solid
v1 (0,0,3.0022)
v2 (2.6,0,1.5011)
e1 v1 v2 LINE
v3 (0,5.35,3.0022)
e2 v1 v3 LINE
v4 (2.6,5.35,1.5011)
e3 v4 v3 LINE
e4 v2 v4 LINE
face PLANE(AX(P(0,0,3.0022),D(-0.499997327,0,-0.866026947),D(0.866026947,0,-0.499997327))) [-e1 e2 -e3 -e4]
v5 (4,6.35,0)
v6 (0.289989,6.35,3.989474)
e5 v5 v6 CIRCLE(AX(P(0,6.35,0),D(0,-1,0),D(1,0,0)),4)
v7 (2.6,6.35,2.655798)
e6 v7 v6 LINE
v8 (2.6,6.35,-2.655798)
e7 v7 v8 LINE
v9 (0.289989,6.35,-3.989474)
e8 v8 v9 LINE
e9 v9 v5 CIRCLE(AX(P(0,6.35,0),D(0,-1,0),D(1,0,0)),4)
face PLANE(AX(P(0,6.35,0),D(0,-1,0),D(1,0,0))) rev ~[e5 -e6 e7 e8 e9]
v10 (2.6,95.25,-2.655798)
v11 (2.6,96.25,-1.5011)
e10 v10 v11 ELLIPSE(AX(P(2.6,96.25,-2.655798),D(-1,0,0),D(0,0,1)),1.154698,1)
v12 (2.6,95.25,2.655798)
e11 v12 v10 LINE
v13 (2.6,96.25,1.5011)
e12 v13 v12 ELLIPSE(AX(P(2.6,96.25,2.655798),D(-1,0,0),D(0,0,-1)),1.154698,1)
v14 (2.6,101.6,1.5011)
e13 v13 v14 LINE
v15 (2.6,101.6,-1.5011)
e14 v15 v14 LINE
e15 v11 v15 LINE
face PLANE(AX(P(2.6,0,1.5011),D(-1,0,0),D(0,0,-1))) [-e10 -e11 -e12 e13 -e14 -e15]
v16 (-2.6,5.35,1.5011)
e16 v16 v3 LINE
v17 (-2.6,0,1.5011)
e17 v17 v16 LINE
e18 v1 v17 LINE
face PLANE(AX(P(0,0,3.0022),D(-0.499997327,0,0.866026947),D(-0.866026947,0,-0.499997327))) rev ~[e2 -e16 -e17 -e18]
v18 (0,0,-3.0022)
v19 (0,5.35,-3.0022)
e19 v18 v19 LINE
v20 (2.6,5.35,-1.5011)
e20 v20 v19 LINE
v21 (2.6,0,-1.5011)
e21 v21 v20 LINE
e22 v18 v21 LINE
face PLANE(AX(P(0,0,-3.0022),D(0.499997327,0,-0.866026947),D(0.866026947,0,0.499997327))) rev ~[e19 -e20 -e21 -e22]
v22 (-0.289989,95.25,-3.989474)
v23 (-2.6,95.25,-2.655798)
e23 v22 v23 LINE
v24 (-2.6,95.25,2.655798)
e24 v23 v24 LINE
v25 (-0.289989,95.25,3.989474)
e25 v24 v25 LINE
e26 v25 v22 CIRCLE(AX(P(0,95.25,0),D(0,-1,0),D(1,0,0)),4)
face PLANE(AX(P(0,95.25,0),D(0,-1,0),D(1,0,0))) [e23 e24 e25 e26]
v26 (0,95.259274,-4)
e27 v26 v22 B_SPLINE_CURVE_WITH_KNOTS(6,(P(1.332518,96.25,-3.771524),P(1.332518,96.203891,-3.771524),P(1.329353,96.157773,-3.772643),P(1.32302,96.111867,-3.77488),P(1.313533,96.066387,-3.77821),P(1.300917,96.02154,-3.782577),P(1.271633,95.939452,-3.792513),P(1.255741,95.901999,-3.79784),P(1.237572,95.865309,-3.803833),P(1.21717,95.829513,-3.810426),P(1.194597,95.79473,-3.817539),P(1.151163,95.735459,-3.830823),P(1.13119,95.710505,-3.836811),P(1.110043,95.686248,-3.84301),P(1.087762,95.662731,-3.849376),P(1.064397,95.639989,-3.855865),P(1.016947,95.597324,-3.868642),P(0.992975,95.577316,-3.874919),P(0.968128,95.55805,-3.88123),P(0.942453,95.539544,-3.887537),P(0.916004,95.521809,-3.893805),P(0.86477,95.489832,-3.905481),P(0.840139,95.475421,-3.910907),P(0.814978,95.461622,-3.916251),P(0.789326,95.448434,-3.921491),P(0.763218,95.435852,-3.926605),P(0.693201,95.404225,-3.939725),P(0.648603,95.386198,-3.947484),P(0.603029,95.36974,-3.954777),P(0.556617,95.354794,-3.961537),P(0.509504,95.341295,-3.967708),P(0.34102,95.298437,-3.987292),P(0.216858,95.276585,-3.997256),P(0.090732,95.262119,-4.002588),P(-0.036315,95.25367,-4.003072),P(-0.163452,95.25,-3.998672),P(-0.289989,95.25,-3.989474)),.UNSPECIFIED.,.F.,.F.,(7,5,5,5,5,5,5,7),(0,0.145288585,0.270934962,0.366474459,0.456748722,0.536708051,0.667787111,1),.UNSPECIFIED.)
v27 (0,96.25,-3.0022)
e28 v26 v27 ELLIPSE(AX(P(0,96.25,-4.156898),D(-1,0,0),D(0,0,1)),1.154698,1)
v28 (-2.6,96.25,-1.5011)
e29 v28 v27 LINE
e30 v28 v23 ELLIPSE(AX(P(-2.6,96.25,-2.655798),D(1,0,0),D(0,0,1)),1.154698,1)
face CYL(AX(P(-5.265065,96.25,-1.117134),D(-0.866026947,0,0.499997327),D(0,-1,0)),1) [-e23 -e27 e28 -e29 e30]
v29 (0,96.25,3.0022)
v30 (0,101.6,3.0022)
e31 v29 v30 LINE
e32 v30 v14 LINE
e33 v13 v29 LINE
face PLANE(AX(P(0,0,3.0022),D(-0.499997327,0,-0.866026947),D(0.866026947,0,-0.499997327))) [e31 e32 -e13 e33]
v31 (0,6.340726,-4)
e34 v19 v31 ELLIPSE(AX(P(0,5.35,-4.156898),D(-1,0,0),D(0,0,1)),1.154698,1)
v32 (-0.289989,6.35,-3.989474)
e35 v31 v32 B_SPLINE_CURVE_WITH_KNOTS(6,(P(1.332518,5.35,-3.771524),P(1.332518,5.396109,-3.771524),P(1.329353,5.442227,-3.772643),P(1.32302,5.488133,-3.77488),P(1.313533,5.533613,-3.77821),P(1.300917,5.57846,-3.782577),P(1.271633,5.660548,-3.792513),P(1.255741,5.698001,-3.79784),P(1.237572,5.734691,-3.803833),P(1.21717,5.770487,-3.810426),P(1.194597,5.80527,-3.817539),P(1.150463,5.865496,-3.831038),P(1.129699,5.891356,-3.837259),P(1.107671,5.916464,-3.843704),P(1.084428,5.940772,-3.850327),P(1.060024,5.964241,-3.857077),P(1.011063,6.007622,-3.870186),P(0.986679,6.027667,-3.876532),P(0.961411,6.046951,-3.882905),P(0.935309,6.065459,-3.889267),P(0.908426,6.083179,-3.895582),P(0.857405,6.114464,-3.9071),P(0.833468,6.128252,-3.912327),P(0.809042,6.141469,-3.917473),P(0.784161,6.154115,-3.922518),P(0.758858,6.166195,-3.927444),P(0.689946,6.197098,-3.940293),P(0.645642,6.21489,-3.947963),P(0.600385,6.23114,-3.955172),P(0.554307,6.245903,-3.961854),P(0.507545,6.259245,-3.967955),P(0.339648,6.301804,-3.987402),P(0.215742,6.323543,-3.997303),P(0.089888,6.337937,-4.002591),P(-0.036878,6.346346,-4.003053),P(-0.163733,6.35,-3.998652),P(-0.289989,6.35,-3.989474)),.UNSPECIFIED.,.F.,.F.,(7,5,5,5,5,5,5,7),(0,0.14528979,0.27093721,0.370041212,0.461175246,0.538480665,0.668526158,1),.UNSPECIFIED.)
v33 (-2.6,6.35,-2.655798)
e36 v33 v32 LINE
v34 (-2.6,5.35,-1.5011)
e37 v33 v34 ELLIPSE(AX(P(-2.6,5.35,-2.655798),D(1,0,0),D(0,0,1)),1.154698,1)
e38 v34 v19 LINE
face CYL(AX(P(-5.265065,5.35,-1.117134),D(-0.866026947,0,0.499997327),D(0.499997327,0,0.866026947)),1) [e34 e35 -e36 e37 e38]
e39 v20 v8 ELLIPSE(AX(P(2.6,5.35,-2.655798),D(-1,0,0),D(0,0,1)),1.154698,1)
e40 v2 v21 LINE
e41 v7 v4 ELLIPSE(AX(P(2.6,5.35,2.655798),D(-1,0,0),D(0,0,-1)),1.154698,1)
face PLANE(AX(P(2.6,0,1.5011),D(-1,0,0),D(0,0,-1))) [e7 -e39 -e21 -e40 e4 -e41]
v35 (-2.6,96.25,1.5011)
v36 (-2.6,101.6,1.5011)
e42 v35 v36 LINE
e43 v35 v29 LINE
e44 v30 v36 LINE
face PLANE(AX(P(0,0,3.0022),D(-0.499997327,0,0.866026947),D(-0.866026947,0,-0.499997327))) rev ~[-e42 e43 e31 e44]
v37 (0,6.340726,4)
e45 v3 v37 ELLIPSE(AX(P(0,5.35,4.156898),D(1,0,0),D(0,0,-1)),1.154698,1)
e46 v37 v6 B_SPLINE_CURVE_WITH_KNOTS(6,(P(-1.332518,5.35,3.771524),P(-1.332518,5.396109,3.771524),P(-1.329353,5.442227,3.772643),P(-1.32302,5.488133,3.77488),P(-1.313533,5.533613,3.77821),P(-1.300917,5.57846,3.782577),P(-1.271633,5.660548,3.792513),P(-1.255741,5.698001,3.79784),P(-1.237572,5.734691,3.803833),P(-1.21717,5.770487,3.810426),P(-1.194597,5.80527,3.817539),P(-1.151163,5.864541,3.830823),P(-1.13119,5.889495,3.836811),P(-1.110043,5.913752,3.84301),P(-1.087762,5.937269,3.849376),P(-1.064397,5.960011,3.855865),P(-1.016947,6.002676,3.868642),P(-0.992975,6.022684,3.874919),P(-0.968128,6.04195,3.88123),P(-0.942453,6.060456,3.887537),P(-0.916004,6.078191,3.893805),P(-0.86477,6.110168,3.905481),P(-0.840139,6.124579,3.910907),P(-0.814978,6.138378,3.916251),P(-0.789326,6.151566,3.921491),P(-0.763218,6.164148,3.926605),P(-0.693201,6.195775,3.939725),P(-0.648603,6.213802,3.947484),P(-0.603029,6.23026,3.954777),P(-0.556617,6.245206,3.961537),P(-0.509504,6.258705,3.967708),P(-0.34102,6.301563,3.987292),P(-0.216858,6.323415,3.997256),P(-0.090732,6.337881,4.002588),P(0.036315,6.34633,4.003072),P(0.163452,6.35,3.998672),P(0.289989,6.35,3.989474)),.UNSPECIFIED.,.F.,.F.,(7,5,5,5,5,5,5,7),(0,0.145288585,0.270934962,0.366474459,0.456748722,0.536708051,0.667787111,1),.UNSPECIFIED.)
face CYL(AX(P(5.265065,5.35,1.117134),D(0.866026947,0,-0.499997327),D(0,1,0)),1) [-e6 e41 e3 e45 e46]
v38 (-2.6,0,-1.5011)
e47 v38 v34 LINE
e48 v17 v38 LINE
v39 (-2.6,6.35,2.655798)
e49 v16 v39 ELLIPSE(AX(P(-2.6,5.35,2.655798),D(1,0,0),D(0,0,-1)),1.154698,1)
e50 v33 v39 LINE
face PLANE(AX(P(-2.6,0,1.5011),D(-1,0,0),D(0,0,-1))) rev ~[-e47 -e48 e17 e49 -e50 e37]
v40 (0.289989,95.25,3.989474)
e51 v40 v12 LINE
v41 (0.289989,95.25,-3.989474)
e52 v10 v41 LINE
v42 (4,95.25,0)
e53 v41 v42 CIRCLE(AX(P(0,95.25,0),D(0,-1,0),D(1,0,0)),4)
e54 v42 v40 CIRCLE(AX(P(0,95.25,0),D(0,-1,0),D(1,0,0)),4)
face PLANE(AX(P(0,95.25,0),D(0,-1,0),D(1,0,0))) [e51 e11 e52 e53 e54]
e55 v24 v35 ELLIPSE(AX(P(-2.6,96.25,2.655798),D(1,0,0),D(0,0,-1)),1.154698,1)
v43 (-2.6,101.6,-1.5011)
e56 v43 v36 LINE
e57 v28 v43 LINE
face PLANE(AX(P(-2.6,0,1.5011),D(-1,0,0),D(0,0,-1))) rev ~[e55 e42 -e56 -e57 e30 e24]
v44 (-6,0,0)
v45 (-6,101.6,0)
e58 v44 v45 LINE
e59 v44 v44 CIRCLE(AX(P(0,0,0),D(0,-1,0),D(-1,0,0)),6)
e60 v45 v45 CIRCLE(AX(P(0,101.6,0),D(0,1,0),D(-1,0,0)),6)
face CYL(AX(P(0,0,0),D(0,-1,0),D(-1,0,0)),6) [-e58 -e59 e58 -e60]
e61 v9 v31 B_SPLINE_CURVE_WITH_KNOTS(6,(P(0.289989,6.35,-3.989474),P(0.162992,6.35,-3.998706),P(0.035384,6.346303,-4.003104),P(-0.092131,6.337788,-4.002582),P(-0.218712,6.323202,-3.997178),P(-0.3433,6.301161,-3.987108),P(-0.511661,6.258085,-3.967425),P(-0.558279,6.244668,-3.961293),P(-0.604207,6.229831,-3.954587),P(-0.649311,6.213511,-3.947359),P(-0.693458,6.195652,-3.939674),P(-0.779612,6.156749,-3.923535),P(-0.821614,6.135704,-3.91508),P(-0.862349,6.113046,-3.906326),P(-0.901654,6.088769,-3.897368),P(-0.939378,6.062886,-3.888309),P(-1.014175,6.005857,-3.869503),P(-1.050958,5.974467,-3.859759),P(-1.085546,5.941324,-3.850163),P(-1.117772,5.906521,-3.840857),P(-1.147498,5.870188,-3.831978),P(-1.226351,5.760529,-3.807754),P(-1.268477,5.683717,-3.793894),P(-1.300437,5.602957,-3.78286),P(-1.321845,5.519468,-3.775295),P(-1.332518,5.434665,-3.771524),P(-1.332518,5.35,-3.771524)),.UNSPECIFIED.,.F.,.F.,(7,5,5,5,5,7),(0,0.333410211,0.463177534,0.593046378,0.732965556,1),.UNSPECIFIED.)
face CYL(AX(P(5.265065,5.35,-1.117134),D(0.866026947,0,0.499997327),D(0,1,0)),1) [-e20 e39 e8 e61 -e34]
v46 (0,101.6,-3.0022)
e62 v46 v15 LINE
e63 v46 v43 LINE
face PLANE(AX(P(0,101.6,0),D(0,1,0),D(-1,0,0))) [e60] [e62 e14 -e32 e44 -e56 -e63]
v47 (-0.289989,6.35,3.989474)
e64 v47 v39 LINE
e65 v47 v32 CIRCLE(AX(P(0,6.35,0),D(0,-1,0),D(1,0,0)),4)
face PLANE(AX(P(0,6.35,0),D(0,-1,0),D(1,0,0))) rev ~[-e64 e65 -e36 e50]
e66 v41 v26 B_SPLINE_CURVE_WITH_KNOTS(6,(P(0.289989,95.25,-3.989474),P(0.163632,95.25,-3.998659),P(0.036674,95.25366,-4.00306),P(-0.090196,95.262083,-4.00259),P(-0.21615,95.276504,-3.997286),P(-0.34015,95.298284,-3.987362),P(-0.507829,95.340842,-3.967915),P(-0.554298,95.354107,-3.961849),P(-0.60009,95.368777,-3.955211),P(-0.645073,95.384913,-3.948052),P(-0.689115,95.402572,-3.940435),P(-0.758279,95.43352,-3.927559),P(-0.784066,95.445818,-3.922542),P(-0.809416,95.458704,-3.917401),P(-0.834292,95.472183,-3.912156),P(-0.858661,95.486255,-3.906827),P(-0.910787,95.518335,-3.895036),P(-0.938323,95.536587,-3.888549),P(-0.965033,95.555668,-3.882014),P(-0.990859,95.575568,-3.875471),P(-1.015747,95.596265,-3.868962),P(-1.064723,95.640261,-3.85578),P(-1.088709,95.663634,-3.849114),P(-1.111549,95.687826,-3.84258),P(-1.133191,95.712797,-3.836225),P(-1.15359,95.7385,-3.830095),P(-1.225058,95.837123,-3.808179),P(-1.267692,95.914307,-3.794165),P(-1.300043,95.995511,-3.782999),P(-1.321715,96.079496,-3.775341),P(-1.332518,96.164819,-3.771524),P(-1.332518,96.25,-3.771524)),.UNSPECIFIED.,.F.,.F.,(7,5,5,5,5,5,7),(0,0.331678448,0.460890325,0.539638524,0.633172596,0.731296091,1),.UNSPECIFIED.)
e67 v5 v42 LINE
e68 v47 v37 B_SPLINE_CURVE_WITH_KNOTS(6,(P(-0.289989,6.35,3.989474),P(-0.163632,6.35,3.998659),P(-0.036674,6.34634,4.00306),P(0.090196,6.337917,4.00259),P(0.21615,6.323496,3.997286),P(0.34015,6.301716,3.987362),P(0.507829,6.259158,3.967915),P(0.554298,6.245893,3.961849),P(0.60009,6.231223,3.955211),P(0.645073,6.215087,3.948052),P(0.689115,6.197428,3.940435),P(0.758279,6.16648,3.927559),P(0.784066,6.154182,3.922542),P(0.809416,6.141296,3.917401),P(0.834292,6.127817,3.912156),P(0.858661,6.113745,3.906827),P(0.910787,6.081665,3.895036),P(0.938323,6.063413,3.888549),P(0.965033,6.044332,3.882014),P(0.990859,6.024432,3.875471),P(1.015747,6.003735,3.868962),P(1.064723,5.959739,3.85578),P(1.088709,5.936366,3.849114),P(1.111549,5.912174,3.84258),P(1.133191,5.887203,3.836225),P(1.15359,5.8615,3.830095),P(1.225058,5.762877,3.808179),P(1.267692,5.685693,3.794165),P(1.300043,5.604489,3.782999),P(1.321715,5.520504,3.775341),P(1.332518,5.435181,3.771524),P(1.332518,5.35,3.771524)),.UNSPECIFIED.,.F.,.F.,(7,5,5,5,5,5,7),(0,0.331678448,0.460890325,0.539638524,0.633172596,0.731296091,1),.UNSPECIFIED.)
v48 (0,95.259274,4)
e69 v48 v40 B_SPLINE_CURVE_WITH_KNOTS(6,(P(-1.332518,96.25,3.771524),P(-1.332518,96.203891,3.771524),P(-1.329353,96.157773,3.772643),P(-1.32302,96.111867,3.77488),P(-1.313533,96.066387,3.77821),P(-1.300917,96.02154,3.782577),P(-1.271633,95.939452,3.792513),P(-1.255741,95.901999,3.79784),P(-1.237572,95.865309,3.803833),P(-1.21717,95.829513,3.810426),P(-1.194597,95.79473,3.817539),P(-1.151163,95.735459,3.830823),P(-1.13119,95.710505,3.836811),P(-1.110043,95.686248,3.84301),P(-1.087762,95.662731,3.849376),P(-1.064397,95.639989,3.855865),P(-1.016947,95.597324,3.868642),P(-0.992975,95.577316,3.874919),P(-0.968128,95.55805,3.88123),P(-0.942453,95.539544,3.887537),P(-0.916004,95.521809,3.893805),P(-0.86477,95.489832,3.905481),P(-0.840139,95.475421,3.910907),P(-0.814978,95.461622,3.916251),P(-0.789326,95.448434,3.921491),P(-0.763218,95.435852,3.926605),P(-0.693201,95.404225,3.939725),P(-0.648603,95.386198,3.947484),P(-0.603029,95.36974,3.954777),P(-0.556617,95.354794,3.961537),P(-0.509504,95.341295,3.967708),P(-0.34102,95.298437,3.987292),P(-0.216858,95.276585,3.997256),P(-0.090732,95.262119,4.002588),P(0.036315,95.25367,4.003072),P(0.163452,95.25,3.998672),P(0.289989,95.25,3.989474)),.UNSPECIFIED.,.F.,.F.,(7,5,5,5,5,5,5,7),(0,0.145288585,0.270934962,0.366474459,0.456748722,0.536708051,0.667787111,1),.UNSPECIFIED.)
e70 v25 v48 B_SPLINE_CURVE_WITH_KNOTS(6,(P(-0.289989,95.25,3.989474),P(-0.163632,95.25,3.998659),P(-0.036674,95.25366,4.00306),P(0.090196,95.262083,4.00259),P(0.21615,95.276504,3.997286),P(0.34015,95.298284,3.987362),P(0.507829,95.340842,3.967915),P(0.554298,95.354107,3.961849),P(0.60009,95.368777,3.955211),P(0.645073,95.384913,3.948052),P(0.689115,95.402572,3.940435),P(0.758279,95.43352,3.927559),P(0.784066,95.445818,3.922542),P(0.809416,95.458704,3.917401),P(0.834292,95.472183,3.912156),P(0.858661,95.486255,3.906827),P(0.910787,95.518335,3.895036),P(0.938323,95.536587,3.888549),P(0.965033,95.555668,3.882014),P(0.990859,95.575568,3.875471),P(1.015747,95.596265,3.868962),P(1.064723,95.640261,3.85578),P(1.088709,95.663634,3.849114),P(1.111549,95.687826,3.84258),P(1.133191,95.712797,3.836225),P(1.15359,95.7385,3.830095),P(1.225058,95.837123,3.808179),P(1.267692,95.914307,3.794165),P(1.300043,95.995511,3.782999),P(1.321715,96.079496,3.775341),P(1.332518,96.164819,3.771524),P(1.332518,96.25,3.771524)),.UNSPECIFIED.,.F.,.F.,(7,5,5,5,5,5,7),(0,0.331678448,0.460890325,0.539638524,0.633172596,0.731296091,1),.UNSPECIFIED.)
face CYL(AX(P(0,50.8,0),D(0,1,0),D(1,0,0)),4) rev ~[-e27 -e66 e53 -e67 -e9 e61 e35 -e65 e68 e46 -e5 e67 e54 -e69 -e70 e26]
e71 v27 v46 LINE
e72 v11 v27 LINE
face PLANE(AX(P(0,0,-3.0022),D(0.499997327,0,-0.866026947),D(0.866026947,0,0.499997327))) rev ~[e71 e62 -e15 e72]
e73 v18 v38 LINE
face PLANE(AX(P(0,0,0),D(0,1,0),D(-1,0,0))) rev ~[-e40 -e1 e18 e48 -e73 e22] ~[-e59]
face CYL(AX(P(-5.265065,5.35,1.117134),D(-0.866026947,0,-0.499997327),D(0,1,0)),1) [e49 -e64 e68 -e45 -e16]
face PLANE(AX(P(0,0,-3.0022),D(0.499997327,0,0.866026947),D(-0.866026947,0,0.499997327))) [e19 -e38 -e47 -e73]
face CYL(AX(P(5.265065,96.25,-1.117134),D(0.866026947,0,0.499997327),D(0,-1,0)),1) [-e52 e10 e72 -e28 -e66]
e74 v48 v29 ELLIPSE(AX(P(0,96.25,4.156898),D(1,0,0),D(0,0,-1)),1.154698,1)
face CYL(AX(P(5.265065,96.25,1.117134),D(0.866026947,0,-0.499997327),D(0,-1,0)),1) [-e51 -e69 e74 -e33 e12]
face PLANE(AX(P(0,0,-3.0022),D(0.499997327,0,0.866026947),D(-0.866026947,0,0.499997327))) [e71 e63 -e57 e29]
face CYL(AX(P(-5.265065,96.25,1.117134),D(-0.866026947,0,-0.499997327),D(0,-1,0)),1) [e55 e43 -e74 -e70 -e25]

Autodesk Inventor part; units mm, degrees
ref_plane "YZ Plane" through (0, 0, 0) normal (1, 0, 0) x (0, 1, 0)
sketch "Sketch3" plane through (0, 0, 0) normal (0, 1, 0) x (-1, 0, 0)
  circle A0 centre (0, 0) radius 6
  line L0 (0, 7.3639) -> (0, 0)
  line L1 (0, 0) -> (0, -8.8137)
  line L2 (6.485, 0) -> (0, 0)
  line L3 (-6.963, 0) -> (0, 0)
  line L4 (0, 3.0022) -> (2.6, 1.5011)
  line L5 (0, 3.0022) -> (3.0022, 3.0022) construction
  circle A1 centre (0, 0) radius 6
  line L6 (0, 3.0022) -> (-2.6, 1.5011)
  line L7 (0, -3.0022) -> (2.6, -1.5011)
  line L8 (0, -3.0022) -> (-2.6, -1.5011)
  line L9 (2.6, 1.5011) -> (2.6, -1.5011)
  line L10 (-2.6, 1.5011) -> (-2.6, -1.5011)
  dimension "d6" = 30
  dimension "d7" = 5.2
  dimension "d8" = 3.0022
  dimension "d9" = 3.0022
  dimension "d34" = 12
extrude "Extrusion2" add sketch "Sketch3" along normal blind 101.6 contours L2 L9 L4 L0 A0 | A0 L1 L7 L9 L2 | L0 L6 L10 L3 A0 | A0 L3 L10 L8 L1
ref_plane "Work Plane1" through (0, 50.8, 0) normal (0, -1, 0) x (1, 0, 0)
ref_plane "Work Plane2" through (6, 0, 0) normal (-1, 0, 0) x (0, -1, 0)
sketch "Sketch4" plane through (6, 0, 0) normal (-1, 0, 0) x (0, -1, 0)
  line L0 (-99.6, 6) -> (-99.6, -6) projected
  line L1 (-99.6, 0) -> (0, 0)
  line L2 (0, 3.0022) -> (-101.6, 3.0022) projected
  circle A0 centre (-50.8, 0) radius 3.75
  circle A1 centre (-36.8, 0) radius 3.75
  circle A2 centre (-22.8, 0) radius 3.75
  circle A3 centre (-8.8, 0) radius 3.75
  circle A4 centre (-64.8, 0) radius 3.75
  circle A5 centre (-50.8, 0) radius 3.75
  circle A6 centre (-36.8, 0) radius 3.75
  circle A7 centre (-22.8, 0) radius 3.75
  circle A8 centre (-78.8, 0) radius 3.75
  circle A9 centre (-64.8, 0) radius 3.75
  circle A10 centre (-50.8, 0) radius 3.75
  circle A11 centre (-36.8, 0) radius 3.75
  circle A12 centre (-92.8, 0) radius 3.75
  circle A13 centre (-78.8, 0) radius 3.75
  circle A14 centre (-64.8, 0) radius 3.75
  circle A15 centre (-50.8, 0) radius 3.75
  point P0 (-1, 3.0022)
  point P1 (-100.6, 3.0022)
  dimension "d17" = 7.5
  dimension "d20" = 14
  dimension "d23" = 14
sketch "Sketch5" plane through (0, 50.8, 0) normal (0, -1, 0) x (1, 0, 0)
  circle A0 centre (0, 0) radius 4
  dimension "d35" = 8
extrude "Inner Cut" cut sketch "Sketch5" along normal mid plane 88.9
fillet "Inner hex fillets" radius 1 4 edges at (1.3, 6.35, -2.2517) (1.3, 6.35, 2.2517) (-1.3, 6.35, 2.2517) (-1.3, 6.35, -2.2517)
mirror "Mirror2" about plane through (0, 50.8, 0) normal (0, -1, 0) of "Inner hex fillets"
equation "\"d8\" = d9"
properties part number "Spinner4inx12mm"
